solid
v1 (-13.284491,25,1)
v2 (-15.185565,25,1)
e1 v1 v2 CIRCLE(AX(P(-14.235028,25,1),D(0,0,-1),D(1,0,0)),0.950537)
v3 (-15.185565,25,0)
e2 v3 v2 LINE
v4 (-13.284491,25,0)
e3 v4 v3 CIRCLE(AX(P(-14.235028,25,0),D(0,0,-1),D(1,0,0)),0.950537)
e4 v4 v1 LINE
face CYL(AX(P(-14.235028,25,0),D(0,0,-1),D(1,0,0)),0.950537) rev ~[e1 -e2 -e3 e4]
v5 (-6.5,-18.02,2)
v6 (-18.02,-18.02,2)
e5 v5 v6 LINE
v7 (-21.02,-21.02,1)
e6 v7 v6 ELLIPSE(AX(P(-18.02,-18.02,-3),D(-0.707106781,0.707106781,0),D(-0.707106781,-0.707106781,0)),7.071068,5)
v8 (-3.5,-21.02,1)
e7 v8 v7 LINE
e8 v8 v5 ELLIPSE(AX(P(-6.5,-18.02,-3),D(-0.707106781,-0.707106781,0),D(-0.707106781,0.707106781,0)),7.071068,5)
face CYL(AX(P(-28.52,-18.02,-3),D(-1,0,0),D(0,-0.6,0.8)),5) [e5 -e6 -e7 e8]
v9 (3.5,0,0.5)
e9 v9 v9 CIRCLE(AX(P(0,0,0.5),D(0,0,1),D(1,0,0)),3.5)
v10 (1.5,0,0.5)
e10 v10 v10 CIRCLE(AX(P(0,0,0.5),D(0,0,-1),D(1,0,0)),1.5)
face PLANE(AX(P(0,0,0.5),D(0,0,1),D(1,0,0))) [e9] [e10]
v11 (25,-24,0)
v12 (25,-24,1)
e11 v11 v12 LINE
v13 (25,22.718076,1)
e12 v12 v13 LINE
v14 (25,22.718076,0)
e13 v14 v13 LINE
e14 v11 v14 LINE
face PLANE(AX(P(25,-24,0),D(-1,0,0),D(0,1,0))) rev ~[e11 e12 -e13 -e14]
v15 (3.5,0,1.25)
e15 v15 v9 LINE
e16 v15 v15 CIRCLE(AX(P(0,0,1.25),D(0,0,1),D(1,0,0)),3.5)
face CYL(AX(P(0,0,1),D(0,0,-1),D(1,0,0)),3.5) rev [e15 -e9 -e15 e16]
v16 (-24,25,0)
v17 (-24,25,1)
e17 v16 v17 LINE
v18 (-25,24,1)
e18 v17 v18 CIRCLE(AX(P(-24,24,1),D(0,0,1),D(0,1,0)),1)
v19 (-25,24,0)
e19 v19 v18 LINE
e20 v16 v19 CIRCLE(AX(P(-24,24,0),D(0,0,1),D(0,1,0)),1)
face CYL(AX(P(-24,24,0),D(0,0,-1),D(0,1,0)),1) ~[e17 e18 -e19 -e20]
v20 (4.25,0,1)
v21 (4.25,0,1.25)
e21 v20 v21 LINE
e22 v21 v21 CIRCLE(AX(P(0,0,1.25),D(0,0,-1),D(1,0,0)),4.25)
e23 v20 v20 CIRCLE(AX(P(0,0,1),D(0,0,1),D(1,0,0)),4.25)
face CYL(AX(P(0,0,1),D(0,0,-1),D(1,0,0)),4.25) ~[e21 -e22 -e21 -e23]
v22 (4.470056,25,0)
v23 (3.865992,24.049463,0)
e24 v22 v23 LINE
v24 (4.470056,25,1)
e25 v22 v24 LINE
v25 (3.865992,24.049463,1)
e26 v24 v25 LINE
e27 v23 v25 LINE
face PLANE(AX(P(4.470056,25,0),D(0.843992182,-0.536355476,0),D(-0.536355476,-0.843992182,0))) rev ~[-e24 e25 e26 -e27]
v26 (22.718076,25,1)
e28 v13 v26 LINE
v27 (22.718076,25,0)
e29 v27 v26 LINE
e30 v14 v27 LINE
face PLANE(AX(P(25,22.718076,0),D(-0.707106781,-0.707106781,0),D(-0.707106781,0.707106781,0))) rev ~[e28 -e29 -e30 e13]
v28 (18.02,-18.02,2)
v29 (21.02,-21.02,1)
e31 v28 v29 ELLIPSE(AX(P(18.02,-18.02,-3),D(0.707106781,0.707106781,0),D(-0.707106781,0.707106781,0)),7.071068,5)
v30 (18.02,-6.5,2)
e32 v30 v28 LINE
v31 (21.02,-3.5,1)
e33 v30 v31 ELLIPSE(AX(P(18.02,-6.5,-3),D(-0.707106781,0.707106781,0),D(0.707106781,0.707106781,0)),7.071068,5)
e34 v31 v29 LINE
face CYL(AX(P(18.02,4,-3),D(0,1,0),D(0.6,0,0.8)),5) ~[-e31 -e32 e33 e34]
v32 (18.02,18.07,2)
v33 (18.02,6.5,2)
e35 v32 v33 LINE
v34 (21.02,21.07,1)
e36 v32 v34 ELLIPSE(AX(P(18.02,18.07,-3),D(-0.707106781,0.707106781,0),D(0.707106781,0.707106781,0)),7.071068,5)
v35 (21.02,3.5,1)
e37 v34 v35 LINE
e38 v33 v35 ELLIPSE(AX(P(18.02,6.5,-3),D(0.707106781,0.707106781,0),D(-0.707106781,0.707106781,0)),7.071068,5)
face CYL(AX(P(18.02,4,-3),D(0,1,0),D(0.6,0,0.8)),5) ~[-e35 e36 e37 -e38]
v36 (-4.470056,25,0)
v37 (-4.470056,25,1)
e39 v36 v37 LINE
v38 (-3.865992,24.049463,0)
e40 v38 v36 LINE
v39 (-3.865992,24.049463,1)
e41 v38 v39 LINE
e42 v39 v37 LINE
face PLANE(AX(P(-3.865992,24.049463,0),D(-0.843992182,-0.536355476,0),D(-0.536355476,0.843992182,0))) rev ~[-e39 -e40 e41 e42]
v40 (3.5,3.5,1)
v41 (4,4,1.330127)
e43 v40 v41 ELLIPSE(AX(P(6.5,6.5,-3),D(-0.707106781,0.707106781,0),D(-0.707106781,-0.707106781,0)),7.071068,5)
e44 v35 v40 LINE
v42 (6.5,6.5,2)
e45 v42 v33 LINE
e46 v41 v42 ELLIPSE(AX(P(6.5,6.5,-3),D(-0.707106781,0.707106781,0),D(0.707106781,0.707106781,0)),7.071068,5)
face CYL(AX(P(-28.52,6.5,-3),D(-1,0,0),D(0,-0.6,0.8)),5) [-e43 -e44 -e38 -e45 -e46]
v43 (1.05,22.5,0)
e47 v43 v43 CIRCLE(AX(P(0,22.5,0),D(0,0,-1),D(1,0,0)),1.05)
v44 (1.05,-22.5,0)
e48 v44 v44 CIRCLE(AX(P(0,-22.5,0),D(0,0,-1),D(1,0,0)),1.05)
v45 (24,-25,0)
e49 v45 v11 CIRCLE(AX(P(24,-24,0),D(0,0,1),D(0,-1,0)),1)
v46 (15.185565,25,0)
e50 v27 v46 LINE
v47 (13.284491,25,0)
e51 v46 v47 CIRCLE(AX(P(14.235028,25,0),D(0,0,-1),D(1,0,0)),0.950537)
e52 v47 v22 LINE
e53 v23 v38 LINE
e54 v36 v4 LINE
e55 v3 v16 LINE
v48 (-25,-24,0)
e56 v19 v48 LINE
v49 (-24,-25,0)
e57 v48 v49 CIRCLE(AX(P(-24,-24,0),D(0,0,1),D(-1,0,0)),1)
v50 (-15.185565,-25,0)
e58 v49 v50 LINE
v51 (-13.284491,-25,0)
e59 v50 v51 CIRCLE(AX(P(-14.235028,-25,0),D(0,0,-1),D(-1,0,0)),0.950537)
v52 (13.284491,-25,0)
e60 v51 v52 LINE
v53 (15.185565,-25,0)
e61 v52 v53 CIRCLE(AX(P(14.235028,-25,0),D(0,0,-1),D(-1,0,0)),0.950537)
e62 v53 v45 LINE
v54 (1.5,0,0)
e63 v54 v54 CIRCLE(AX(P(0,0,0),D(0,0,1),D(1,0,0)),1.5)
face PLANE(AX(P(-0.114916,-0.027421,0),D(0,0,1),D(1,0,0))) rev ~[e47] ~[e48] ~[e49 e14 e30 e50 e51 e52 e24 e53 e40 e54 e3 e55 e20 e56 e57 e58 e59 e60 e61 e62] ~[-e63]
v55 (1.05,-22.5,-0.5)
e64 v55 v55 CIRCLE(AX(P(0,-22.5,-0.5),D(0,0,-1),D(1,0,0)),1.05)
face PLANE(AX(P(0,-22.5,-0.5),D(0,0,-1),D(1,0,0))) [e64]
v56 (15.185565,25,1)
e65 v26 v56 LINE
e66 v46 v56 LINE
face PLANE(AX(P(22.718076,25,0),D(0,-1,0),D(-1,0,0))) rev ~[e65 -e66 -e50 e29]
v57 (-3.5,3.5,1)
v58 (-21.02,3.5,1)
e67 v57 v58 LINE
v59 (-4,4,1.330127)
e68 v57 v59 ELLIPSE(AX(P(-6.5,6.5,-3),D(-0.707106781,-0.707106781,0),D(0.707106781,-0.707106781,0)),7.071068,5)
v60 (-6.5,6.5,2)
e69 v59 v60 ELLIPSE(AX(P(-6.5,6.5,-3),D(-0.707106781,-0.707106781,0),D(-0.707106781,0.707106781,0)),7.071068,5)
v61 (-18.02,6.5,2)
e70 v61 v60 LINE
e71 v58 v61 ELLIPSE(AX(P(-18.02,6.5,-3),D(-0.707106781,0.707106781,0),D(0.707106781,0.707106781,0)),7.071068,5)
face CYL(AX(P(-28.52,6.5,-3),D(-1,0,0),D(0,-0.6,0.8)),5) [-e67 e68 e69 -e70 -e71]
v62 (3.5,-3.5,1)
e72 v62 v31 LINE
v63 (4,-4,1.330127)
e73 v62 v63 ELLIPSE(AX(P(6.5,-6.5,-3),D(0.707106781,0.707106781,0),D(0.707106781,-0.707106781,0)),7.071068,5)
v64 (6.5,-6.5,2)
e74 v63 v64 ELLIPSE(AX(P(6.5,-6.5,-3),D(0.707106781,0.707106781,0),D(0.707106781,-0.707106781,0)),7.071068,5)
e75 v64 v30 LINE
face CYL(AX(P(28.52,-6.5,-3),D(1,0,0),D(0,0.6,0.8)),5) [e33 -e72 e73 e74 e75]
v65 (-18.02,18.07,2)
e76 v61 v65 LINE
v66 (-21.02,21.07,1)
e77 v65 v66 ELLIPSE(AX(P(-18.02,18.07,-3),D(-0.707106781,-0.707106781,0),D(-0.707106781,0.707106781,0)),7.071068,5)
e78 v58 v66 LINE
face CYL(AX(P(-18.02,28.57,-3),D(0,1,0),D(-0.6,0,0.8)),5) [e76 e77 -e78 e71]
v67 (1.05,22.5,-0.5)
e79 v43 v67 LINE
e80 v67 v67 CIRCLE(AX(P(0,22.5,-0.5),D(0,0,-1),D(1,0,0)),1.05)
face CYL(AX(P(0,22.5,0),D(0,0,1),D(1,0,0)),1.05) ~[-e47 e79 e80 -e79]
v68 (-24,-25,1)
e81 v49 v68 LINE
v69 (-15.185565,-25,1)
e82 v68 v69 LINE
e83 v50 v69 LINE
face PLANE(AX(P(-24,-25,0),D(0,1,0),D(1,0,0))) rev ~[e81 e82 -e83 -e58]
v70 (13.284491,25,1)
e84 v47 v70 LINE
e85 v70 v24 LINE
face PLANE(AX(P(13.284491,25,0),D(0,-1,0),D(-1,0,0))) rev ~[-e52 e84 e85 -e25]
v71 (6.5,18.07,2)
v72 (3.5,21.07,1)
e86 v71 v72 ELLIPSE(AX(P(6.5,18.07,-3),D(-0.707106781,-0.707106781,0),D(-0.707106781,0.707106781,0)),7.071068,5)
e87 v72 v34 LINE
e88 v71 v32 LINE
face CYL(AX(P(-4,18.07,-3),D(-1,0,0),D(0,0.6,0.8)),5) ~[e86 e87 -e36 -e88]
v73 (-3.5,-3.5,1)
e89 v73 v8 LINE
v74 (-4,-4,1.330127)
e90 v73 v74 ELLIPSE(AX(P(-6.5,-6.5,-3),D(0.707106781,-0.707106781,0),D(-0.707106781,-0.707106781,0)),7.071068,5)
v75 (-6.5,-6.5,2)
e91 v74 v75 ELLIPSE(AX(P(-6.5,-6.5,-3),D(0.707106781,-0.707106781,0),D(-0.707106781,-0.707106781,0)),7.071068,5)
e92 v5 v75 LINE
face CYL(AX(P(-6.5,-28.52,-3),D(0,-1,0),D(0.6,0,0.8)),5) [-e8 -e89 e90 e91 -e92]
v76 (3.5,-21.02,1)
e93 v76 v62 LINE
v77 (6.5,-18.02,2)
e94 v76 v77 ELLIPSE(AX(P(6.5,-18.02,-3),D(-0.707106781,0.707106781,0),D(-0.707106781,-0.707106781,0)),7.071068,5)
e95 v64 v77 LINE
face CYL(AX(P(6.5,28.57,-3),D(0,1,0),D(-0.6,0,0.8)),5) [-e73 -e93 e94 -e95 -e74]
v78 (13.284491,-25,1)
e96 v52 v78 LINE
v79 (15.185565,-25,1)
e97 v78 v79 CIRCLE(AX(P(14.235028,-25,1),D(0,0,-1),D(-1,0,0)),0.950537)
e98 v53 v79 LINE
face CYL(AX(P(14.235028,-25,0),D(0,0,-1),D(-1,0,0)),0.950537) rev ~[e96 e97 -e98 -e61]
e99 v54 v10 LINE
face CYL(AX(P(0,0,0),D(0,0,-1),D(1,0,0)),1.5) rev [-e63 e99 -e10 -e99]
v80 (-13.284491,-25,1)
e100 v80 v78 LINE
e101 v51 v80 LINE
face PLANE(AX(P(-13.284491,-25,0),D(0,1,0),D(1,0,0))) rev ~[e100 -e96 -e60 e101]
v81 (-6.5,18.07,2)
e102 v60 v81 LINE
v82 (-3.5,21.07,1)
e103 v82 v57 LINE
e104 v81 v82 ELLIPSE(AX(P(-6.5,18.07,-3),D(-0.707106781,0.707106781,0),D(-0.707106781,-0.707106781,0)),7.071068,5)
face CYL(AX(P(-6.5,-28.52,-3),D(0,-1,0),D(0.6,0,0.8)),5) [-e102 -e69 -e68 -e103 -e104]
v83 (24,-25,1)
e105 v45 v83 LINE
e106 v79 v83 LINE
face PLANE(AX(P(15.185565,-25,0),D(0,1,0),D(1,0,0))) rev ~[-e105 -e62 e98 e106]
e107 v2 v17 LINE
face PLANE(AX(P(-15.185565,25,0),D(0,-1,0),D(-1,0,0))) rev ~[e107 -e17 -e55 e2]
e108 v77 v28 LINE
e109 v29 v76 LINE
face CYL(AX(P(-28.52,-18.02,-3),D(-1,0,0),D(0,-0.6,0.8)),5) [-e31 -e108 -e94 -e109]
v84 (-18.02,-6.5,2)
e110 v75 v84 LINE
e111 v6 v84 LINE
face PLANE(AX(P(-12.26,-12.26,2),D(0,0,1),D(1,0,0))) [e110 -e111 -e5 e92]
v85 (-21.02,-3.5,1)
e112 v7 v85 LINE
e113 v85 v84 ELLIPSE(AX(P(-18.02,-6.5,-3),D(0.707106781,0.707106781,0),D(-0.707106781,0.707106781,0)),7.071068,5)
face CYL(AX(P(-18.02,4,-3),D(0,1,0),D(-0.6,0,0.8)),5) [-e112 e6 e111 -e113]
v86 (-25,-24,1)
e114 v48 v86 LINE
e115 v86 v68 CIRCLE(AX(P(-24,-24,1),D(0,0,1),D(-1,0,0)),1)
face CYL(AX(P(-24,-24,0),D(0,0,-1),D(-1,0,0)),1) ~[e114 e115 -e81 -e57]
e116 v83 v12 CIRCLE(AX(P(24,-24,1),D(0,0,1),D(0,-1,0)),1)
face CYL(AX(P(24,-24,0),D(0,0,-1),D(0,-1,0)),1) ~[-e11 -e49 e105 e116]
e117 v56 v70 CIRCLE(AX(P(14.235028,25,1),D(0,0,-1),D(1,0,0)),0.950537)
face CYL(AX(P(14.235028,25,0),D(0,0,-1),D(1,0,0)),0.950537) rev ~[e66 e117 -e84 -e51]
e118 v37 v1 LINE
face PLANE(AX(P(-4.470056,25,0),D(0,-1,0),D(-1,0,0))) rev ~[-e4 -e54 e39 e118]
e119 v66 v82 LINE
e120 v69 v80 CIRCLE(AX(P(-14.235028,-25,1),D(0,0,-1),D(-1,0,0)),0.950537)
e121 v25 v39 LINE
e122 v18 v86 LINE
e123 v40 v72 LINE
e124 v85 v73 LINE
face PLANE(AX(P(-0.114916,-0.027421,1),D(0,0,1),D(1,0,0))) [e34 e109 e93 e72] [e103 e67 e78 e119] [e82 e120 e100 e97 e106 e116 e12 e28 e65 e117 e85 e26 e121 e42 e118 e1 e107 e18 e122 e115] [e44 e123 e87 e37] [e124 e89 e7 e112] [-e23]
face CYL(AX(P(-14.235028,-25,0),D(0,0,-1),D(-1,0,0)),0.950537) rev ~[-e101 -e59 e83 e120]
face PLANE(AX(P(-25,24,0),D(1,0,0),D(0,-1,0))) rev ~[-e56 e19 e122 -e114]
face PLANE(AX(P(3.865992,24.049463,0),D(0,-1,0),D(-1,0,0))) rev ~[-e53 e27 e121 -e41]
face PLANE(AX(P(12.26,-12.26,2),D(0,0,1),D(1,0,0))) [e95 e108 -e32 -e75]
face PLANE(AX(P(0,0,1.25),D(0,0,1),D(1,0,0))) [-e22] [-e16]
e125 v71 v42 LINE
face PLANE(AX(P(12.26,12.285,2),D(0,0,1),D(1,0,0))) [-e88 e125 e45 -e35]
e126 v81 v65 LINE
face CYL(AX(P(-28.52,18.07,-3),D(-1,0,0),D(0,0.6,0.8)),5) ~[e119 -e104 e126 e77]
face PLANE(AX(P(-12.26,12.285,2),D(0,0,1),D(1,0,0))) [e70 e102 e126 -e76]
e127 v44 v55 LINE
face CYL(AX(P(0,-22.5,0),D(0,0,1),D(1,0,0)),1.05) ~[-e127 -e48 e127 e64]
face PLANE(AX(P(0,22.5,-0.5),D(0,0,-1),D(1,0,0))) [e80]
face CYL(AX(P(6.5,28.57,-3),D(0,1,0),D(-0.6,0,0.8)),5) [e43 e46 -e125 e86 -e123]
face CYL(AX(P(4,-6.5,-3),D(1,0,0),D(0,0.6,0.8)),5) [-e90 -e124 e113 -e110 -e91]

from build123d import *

# Parameters (mm, degrees)
F0_W         = 17.52
F0_H         = 17.52
F0_H_2       = 17.57
F0_R         = 1.5
F1_DEPTH     = 1
F2_W         = 17.52
F2_H         = 17.57
F2_H_2       = 17.52
F3_DEPTH     = 1
F4_R         = 3.5
F5_DEPTH     = 0.5
F6_R         = 4.25
F6_R_2       = 3.5
F7_DEPTH     = 0.25
F8_T1_DEPTH  = 32.52
F8_T3_DEPTH  = 32.52
F8_T5_DEPTH  = 32.57
F8_T7_DEPTH  = 32.52
F8_T12_DEPTH = 32.52
F8_S13_R     = 4.25
F8_T14_DEPTH = 18
F8_T18_DEPTH = 32.52
F8_S19_R     = 4.25
F8_T20_DEPTH = 18
F8_T24_DEPTH = 32.52
F8_S25_R     = 4.25
F8_T26_DEPTH = 18
F8_T30_DEPTH = 32.57
F8_S31_R     = 4.25
F8_T32_DEPTH = 18
F8_T36_DEPTH = 32.57
F8_S37_R     = 4.25
F8_T38_DEPTH = 18
F8_T42_DEPTH = 32.52
F8_S43_R     = 4.25
F8_T44_DEPTH = 18
F8_T48_DEPTH = 32.52
F8_S49_R     = 4.25
F8_T50_DEPTH = 18
F8_T54_DEPTH = 32.52
F8_S55_R     = 4.25
F8_T56_DEPTH = 18
F9_R         = 1.05
F10_DEPTH    = 0.5


# Not quite as in the source:
# - a fillet or chamfer that OpenCascade refuses, or shapes differently, is made with other operations: its cross-section is extruded or revolved along the edge and cut away or added


with BuildPart() as f1:
    # F0 (on Top) → F1 (new body)
    with BuildSketch(Plane.XY):
        with BuildLine():
            ThreePointArc((-25, -24), (-24.7071067812, -24.7071067812), (-24, -25))
            Line((-24, -25), (-15.1855654437, -25))
            ThreePointArc((-15.1855654437, -25), (-14.2350281943, -24.0494627506), (-13.2844909448, -25))
            Line((-13.2844909448, -25), (13.2844909448, -25))
            ThreePointArc((13.2844909448, -25), (14.2350281943, -24.0494627506), (15.1855654437, -25))
            Line((15.1855654437, -25), (24, -25))
            ThreePointArc((24, -25), (24.7071067812, -24.7071067812), (25, -24))
            Line((25, -24), (25, 22.7180756629))
            Line((25, 22.7180756629), (22.7180756629, 25))
            Line((22.7180756629, 25), (15.1855654437, 25))
            ThreePointArc((15.1855654437, 25), (14.2350281943, 24.0494627506), (13.2844909448, 25))
            Line((13.2844909448, 25), (4.4700563885, 25))
            Line((4.4700563885, 25), (3.8659917191, 24.0494627506))
            Line((3.8659917191, 24.0494627506), (0, 24.0494627506))
            Line((0, 24.0494627506), (-3.8659917191, 24.0494627506))
            Line((-3.8659917191, 24.0494627506), (-4.4700563885, 25))
            Line((-4.4700563885, 25), (-13.2844909448, 25))
            ThreePointArc((-13.2844909448, 25), (-14.2350281943, 24.0494627506), (-15.1855654437, 25))
            Line((-15.1855654437, 25), (-24, 25))
            ThreePointArc((-24, 25), (-24.7071067812, 24.7071067812), (-25, 24))
            Line((-25, 24), (-25, -24))
        make_face()
        with Locations((-12.26, -12.26)):
            Rectangle(F0_W, F0_H, mode=Mode.SUBTRACT)
        with Locations((12.26, -12.26)):
            Rectangle(F0_W, F0_H, mode=Mode.SUBTRACT)
        with Locations((-12.26, 12.285)):
            Rectangle(F0_W, F0_H_2, mode=Mode.SUBTRACT)
        Circle(F0_R, mode=Mode.SUBTRACT)
        with Locations((12.26, 12.285)):
            Rectangle(F0_W, F0_H_2, mode=Mode.SUBTRACT)
    extrude(amount=F1_DEPTH)

    # F2 (on face) → F3 (join, symmetric)
    with BuildSketch(Plane.XY.offset(1)):
        with Locations((-12.26, 12.285)):
            Rectangle(F2_W, F2_H)
        with Locations((12.26, 12.285)):
            Rectangle(F2_W, F2_H)
        with Locations((12.26, -12.26)):
            Rectangle(F2_W, F2_H_2)
        with Locations((-12.26, -12.26)):
            Rectangle(F2_W, F2_H_2)
    extrude(amount=F3_DEPTH, both=True)

    # F4 (on face) → F5 (cut)
    with BuildSketch(Plane.XY.offset(1)):
        Circle(F4_R)
    extrude(amount=-F5_DEPTH, mode=Mode.SUBTRACT)

    # F6 (on face) → F7 (join)
    with BuildSketch(Plane.XY.offset(1)):
        Circle(F6_R)
        Circle(F6_R_2, mode=Mode.SUBTRACT)
    extrude(amount=F7_DEPTH)

    # F8: fillet of radius 5 on 16 edges, made by hand

    # F8_s2 → F8_t1 (cut)
    with BuildSketch(Plane.YZ.offset(-28.52)):
        with BuildLine():
            ThreePointArc((-21.02, 1), (-19.6011388301, 1.7434164903), (-18.02, 2))
            Line((-18.02, 2), (-21.02, 2))
            Line((-21.02, 2), (-21.02, 1))
        make_face()
        with BuildLine():
            ThreePointArc((21.07, 1), (19.6511388301, 1.7434164903), (18.07, 2))
            Line((18.07, 2), (21.07, 2))
            Line((21.07, 2), (21.07, 1))
        make_face()
    extrude(amount=F8_T1_DEPTH, mode=Mode.SUBTRACT)

    # F8_s4 → F8_t3 (cut)
    with BuildSketch(Plane.XZ.offset(-4)):
        with BuildLine():
            ThreePointArc((-21.02, 1), (-19.6011388301, 1.7434164903), (-18.02, 2))
            Line((-18.02, 2), (-21.02, 2))
            Line((-21.02, 2), (-21.02, 1))
        make_face()
        with BuildLine():
            ThreePointArc((21.02, 1), (19.6011388301, 1.7434164903), (18.02, 2))
            Line((18.02, 2), (21.02, 2))
            Line((21.02, 2), (21.02, 1))
        make_face()
    extrude(amount=F8_T3_DEPTH, mode=Mode.SUBTRACT)

    # F8_s6 → F8_t5 (cut)
    with BuildSketch(Plane.XZ.offset(-28.57)):
        with BuildLine():
            ThreePointArc((-21.02, 1), (-19.6011388301, 1.7434164903), (-18.02, 2))
            Line((-18.02, 2), (-21.02, 2))
            Line((-21.02, 2), (-21.02, 1))
        make_face()
        with BuildLine():
            ThreePointArc((21.02, 1), (19.6011388301, 1.7434164903), (18.02, 2))
            Line((18.02, 2), (21.02, 2))
            Line((21.02, 2), (21.02, 1))
        make_face()
    extrude(amount=F8_T5_DEPTH, mode=Mode.SUBTRACT)

    # F8_s8 → F8_t7 (cut)
    with BuildSketch(Plane.YZ.offset(-4)):
        with BuildLine():
            ThreePointArc((21.07, 1), (19.6511388301, 1.7434164903), (18.07, 2))
            Line((18.07, 2), (21.07, 2))
            Line((21.07, 2), (21.07, 1))
        make_face()
        with BuildLine():
            ThreePointArc((-21.02, 1), (-19.6011388301, 1.7434164903), (-18.02, 2))
            Line((-18.02, 2), (-21.02, 2))
            Line((-21.02, 2), (-21.02, 1))
        make_face()
    extrude(amount=F8_T7_DEPTH, mode=Mode.SUBTRACT)


with BuildPart() as f8_tool10:
    # F8_s11 → F8_t12 (new body)
    with BuildSketch(Plane.XZ.offset(28.52)):
        with BuildLine():
            ThreePointArc((-3.5, 1), (-4.9188611699, 1.7434164903), (-6.5, 2))
            Line((-6.5, 2), (-3.5, 2))
            Line((-3.5, 2), (-3.5, 1))
        make_face()
    extrude(amount=-F8_T12_DEPTH)

    # F8_s13 → F8_t14 (cut, symmetric)
    with BuildSketch(Plane.XY.offset(1.5)):
        Circle(F8_S13_R)
    extrude(amount=F8_T14_DEPTH, both=True, mode=Mode.SUBTRACT)


with BuildPart() as f1_1:
    add(f1.part)

    # F8_t9: cut F8_tool10
    add(f8_tool10.part, mode=Mode.SUBTRACT)


with BuildPart() as f8_tool16:
    # F8_s17 → F8_t18 (new body)
    with BuildSketch(Plane.YZ.offset(4)):
        with BuildLine():
            ThreePointArc((-3.5, 1), (-4.9188611699, 1.7434164903), (-6.5, 2))
            Line((-6.5, 2), (-3.5, 2))
            Line((-3.5, 2), (-3.5, 1))
        make_face()
    extrude(amount=-F8_T18_DEPTH)

    # F8_s19 → F8_t20 (cut, symmetric)
    with BuildSketch(Plane.XY.offset(1.5)):
        Circle(F8_S19_R)
    extrude(amount=F8_T20_DEPTH, both=True, mode=Mode.SUBTRACT)


with BuildPart() as f1_2:
    add(f1_1.part)

    # F8_t15: cut F8_tool16
    add(f8_tool16.part, mode=Mode.SUBTRACT)


with BuildPart() as f8_tool22:
    # F8_s23 → F8_t24 (new body)
    with BuildSketch(Plane.YZ.offset(-28.52)):
        with BuildLine():
            ThreePointArc((3.5, 1), (4.9188611699, 1.7434164903), (6.5, 2))
            Line((6.5, 2), (3.5, 2))
            Line((3.5, 2), (3.5, 1))
        make_face()
    extrude(amount=F8_T24_DEPTH)

    # F8_s25 → F8_t26 (cut, symmetric)
    with BuildSketch(Plane.XY.offset(1.5)):
        Circle(F8_S25_R)
    extrude(amount=F8_T26_DEPTH, both=True, mode=Mode.SUBTRACT)


with BuildPart() as f1_3:
    add(f1_2.part)

    # F8_t21: cut F8_tool22
    add(f8_tool22.part, mode=Mode.SUBTRACT)


with BuildPart() as f8_tool28:
    # F8_s29 → F8_t30 (new body)
    with BuildSketch(Plane.XZ.offset(4)):
        with BuildLine():
            ThreePointArc((-3.5, 1), (-4.9188611699, 1.7434164903), (-6.5, 2))
            Line((-6.5, 2), (-3.5, 2))
            Line((-3.5, 2), (-3.5, 1))
        make_face()
    extrude(amount=-F8_T30_DEPTH)

    # F8_s31 → F8_t32 (cut, symmetric)
    with BuildSketch(Plane.XY.offset(1.5)):
        Circle(F8_S31_R)
    extrude(amount=F8_T32_DEPTH, both=True, mode=Mode.SUBTRACT)


with BuildPart() as f1_4:
    add(f1_3.part)

    # F8_t27: cut F8_tool28
    add(f8_tool28.part, mode=Mode.SUBTRACT)


with BuildPart() as f8_tool34:
    # F8_s35 → F8_t36 (new body)
    with BuildSketch(Plane.XZ.offset(-28.57)):
        with BuildLine():
            ThreePointArc((3.5, 1), (4.9188611699, 1.7434164903), (6.5, 2))
            Line((6.5, 2), (3.5, 2))
            Line((3.5, 2), (3.5, 1))
        make_face()
    extrude(amount=F8_T36_DEPTH)

    # F8_s37 → F8_t38 (cut, symmetric)
    with BuildSketch(Plane.XY.offset(1.5)):
        Circle(F8_S37_R)
    extrude(amount=F8_T38_DEPTH, both=True, mode=Mode.SUBTRACT)


with BuildPart() as f1_5:
    add(f1_4.part)

    # F8_t33: cut F8_tool34
    add(f8_tool34.part, mode=Mode.SUBTRACT)


with BuildPart() as f8_tool40:
    # F8_s41 → F8_t42 (new body)
    with BuildSketch(Plane.YZ.offset(-4)):
        with BuildLine():
            ThreePointArc((3.5, 1), (4.9188611699, 1.7434164903), (6.5, 2))
            Line((6.5, 2), (3.5, 2))
            Line((3.5, 2), (3.5, 1))
        make_face()
    extrude(amount=F8_T42_DEPTH)

    # F8_s43 → F8_t44 (cut, symmetric)
    with BuildSketch(Plane.XY.offset(1.5)):
        Circle(F8_S43_R)
    extrude(amount=F8_T44_DEPTH, both=True, mode=Mode.SUBTRACT)


with BuildPart() as f1_6:
    add(f1_5.part)

    # F8_t39: cut F8_tool40
    add(f8_tool40.part, mode=Mode.SUBTRACT)


with BuildPart() as f8_tool46:
    # F8_s47 → F8_t48 (new body)
    with BuildSketch(Plane.YZ.offset(28.52)):
        with BuildLine():
            ThreePointArc((-3.5, 1), (-4.9188611699, 1.7434164903), (-6.5, 2))
            Line((-6.5, 2), (-3.5, 2))
            Line((-3.5, 2), (-3.5, 1))
        make_face()
    extrude(amount=-F8_T48_DEPTH)

    # F8_s49 → F8_t50 (cut, symmetric)
    with BuildSketch(Plane.XY.offset(1.5)):
        Circle(F8_S49_R)
    extrude(amount=F8_T50_DEPTH, both=True, mode=Mode.SUBTRACT)


with BuildPart() as f1_7:
    add(f1_6.part)

    # F8_t45: cut F8_tool46
    add(f8_tool46.part, mode=Mode.SUBTRACT)


with BuildPart() as f8_tool52:
    # F8_s53 → F8_t54 (new body)
    with BuildSketch(Plane.XZ.offset(-4)):
        with BuildLine():
            ThreePointArc((3.5, 1), (4.9188611699, 1.7434164903), (6.5, 2))
            Line((6.5, 2), (3.5, 2))
            Line((3.5, 2), (3.5, 1))
        make_face()
    extrude(amount=F8_T54_DEPTH)

    # F8_s55 → F8_t56 (cut, symmetric)
    with BuildSketch(Plane.XY.offset(1.5)):
        Circle(F8_S55_R)
    extrude(amount=F8_T56_DEPTH, both=True, mode=Mode.SUBTRACT)


with BuildPart() as f1_8:
    add(f1_7.part)

    # F8_t51: cut F8_tool52
    add(f8_tool52.part, mode=Mode.SUBTRACT)

    # F9 (on face) → F10 (join)
    with BuildSketch(Plane(origin=(0, 0, 0), x_dir=(1, 0, 0), z_dir=(0, 0, -1))):
        with Locations((0, 22.5)):
            Circle(F9_R)
        with Locations((0, -22.5)):
            Circle(F9_R)
    extrude(amount=F10_DEPTH)


solid = f1_8.part
